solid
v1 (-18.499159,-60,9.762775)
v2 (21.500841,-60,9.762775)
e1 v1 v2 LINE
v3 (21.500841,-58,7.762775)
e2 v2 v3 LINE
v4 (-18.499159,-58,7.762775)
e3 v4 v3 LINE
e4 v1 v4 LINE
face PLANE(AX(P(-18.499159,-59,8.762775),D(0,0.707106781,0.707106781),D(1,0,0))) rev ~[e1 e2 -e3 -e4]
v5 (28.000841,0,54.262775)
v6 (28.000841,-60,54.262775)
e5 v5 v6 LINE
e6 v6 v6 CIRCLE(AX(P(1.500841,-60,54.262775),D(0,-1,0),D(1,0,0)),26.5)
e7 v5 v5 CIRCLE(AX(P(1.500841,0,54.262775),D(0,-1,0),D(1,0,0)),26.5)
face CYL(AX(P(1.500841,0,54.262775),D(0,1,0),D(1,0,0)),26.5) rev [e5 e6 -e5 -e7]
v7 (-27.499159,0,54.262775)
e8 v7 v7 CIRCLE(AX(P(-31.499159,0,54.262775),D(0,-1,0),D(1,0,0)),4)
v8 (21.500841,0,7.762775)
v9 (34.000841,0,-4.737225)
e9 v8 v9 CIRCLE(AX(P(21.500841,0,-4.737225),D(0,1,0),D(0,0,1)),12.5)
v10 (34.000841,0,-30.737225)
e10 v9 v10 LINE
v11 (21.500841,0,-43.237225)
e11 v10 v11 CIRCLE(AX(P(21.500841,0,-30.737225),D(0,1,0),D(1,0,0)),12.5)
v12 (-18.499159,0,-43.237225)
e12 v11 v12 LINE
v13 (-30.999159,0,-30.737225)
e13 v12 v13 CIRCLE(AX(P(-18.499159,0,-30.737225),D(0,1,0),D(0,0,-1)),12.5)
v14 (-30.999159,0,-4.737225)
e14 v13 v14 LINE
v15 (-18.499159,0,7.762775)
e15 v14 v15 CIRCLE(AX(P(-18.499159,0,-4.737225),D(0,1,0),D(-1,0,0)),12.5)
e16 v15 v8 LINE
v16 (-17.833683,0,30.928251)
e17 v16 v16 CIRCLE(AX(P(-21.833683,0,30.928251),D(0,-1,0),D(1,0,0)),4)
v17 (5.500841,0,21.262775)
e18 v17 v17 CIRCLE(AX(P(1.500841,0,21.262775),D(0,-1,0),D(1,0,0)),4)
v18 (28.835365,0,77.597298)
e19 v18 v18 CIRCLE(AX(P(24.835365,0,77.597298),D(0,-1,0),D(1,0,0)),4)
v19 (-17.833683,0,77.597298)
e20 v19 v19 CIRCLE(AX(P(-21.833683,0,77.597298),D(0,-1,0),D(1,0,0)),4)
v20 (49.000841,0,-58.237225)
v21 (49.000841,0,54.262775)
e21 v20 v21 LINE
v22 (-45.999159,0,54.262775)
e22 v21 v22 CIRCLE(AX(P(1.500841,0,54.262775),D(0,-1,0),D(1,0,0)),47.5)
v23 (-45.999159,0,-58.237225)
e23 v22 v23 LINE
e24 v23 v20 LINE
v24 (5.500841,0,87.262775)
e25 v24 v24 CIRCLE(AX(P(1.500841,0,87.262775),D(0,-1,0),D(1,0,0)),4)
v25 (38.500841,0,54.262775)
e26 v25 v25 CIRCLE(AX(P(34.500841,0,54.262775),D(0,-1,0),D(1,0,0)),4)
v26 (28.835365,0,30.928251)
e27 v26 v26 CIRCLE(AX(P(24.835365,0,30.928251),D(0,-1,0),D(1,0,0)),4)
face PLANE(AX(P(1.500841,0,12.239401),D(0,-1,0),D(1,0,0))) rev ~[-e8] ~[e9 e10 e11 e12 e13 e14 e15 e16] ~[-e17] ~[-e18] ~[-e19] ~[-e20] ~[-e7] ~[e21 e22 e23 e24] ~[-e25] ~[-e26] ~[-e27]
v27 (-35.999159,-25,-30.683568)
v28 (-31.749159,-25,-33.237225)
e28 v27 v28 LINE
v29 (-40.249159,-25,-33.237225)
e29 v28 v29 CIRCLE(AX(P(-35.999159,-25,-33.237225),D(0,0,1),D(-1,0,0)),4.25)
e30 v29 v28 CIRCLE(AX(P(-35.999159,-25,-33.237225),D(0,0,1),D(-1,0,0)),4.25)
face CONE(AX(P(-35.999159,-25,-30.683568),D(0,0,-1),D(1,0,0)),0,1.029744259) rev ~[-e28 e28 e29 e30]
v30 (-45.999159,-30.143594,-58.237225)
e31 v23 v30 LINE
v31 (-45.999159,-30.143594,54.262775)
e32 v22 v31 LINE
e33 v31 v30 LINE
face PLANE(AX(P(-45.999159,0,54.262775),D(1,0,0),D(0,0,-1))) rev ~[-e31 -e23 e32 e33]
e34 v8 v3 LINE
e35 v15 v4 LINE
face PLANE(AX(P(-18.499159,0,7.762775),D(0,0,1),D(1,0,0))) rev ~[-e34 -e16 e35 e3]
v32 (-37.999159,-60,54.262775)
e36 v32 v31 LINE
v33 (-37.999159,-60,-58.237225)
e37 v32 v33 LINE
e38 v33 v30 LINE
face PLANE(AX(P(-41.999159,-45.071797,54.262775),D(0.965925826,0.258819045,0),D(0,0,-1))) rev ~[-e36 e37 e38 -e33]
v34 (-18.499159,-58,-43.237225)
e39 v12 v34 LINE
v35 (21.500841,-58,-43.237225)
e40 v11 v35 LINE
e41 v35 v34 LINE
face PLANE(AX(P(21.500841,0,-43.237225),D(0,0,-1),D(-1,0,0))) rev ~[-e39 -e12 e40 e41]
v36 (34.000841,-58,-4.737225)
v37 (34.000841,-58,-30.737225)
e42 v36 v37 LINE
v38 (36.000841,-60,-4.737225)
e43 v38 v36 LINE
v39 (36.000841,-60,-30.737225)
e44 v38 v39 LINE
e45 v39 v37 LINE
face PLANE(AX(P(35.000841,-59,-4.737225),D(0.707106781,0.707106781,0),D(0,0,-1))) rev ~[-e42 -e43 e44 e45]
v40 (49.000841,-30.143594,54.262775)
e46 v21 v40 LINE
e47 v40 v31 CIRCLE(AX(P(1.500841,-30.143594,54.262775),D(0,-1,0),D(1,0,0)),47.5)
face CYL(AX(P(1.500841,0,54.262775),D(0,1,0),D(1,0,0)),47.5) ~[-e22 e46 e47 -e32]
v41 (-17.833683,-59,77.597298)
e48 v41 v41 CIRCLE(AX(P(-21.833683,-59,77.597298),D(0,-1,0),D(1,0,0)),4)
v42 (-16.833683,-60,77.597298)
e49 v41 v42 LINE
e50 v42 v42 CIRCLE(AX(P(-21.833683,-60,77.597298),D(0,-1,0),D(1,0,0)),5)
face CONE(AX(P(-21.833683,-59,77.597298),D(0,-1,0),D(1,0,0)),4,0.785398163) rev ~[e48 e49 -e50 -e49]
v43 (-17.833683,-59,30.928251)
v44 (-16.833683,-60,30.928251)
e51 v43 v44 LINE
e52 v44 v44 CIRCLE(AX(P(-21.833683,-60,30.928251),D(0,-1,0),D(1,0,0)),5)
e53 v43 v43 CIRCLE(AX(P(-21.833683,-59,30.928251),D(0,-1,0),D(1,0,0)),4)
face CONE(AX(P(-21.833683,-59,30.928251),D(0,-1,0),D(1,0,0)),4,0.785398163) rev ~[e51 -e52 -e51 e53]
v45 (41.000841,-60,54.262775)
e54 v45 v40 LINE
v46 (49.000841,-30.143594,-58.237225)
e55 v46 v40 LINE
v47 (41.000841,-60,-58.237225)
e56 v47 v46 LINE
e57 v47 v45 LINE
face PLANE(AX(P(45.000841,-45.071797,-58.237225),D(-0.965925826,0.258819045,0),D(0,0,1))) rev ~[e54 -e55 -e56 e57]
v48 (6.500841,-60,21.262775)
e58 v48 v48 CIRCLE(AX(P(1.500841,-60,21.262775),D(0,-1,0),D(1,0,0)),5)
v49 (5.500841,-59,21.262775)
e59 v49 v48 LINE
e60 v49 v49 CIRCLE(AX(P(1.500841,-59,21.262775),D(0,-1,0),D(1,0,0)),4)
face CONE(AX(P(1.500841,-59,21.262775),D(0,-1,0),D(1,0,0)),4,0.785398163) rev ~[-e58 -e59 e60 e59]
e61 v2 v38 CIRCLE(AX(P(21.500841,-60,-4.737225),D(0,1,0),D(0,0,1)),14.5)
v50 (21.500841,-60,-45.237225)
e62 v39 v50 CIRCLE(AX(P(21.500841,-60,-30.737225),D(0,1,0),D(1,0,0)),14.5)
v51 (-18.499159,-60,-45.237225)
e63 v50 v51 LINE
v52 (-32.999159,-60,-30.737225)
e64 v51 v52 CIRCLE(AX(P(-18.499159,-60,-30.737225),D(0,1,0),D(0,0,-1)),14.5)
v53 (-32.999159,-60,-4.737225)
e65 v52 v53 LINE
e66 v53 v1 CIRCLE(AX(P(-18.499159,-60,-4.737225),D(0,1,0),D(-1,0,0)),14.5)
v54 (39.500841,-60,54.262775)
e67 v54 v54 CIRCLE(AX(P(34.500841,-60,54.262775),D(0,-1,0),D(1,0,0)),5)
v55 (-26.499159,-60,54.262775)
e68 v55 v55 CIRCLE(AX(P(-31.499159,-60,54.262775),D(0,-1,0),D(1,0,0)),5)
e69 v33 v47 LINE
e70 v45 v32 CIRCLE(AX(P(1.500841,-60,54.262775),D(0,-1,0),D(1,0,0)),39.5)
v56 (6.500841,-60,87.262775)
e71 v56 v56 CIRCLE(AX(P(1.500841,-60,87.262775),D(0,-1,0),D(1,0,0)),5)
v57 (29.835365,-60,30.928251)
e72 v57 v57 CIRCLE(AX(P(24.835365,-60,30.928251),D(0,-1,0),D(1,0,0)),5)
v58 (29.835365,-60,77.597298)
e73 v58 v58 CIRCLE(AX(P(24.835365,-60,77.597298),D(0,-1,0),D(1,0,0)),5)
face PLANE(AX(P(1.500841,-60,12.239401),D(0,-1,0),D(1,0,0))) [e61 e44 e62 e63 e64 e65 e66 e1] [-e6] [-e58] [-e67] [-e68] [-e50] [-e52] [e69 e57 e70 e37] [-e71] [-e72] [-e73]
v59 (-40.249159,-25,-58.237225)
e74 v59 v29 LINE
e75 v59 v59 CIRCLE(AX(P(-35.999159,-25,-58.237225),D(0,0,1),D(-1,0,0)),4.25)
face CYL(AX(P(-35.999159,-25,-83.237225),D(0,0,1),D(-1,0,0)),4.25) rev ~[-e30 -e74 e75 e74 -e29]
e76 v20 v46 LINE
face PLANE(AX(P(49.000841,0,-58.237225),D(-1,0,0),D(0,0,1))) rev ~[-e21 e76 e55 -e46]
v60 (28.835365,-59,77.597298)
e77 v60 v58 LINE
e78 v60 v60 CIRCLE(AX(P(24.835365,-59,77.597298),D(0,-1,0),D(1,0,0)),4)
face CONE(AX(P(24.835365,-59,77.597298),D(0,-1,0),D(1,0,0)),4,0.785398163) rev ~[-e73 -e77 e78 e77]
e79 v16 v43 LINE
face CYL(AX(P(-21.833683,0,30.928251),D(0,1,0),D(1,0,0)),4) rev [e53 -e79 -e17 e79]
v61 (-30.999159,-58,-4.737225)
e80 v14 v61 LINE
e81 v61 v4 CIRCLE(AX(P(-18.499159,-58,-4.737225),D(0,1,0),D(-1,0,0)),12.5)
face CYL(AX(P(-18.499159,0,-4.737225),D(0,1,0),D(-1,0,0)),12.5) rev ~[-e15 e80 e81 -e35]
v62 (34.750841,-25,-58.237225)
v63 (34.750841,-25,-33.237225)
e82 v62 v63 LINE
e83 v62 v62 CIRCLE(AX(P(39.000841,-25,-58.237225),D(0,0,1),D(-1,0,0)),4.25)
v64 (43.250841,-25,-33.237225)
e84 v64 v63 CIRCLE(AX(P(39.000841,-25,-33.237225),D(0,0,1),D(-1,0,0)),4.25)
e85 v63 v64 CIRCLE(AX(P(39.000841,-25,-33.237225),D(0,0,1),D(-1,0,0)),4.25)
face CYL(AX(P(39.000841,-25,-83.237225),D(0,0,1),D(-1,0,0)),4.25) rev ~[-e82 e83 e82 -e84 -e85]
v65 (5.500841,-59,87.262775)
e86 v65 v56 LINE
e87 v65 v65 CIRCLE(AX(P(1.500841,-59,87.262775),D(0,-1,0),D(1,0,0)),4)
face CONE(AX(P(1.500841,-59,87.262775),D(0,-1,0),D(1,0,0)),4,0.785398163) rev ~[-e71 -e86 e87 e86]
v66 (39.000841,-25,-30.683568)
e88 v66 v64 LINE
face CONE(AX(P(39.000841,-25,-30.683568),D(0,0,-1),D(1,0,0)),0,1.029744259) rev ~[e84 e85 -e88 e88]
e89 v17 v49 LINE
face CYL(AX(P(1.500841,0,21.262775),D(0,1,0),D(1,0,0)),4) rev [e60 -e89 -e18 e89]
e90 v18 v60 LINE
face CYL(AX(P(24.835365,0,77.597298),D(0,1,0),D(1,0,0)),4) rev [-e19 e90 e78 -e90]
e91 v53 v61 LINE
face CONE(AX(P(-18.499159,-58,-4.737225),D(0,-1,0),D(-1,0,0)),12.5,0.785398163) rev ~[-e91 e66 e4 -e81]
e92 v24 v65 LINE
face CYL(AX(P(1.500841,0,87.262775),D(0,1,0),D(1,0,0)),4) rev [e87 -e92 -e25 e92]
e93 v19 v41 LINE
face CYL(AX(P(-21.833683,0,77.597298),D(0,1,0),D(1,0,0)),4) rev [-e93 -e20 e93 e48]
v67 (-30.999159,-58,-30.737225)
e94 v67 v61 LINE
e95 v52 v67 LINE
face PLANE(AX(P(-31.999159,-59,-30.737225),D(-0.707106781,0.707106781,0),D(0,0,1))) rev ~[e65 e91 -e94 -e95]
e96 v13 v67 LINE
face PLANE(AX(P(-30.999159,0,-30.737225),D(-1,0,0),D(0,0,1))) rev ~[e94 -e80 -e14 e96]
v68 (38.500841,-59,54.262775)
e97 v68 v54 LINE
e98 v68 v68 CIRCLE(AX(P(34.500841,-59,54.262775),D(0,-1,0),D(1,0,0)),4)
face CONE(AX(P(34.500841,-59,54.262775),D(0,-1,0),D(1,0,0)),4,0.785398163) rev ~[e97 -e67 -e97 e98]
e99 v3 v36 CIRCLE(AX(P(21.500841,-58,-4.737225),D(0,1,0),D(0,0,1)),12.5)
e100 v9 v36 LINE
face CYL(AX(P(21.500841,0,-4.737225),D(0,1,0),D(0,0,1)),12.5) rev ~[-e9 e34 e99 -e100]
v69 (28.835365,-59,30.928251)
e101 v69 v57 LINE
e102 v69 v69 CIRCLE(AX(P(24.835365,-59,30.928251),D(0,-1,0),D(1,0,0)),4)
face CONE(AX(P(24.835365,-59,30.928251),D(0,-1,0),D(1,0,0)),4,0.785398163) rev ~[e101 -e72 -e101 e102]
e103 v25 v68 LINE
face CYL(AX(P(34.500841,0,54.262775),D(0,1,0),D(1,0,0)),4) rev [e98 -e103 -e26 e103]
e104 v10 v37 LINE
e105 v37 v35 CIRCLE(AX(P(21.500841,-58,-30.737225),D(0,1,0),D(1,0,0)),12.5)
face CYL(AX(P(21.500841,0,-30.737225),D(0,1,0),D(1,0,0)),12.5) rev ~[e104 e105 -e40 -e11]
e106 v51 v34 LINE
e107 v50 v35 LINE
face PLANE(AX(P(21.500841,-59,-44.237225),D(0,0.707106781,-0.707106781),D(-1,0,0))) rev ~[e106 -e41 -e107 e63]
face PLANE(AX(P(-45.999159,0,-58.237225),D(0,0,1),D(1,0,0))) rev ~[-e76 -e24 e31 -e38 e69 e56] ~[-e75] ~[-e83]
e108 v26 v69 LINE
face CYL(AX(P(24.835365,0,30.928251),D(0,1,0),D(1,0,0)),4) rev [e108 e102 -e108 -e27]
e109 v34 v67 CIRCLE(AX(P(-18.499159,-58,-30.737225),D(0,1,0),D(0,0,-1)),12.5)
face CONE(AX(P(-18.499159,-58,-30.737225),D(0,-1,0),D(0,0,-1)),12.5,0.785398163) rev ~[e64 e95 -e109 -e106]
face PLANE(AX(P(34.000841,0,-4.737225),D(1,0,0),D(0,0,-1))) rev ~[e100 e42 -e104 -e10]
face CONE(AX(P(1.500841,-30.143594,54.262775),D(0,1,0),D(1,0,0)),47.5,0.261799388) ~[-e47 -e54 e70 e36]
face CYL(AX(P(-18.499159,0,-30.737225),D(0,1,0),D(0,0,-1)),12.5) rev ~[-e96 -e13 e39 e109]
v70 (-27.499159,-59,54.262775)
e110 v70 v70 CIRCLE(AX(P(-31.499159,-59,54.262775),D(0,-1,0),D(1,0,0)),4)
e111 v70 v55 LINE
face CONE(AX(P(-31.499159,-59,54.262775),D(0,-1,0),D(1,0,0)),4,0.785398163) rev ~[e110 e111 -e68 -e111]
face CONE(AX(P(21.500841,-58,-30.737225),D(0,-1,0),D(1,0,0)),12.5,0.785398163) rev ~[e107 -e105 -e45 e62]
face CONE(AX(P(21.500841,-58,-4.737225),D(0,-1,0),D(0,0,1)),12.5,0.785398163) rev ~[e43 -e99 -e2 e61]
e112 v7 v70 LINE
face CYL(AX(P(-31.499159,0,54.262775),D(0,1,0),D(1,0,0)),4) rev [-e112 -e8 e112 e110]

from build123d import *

# Parameters (mm, degrees)
F0_R     = 4
F0_R_2   = 26.5
F1_DEPTH = 60
F2_SIZE  = 1
F3_SIZE  = 2
F4_SIZE2 = 29.8564064606
F4_SIZE  = 8
F6_D     = 8.5
F6_DEPTH = 25
F6_TIP   = 2.5536576309


with BuildPart() as f1:
    # F0 (on Front) → F1 (new body)
    with BuildSketch(Plane.XZ):
        with BuildLine():
            Line((-45.9991587698, 54.2627746064), (-45.9991587698, -58.2372253936))
            Line((-45.9991587698, -58.2372253936), (49.0008412302, -58.2372253936))
            Line((49.0008412302, -58.2372253936), (49.0008412302, 54.2627746064))
            ThreePointArc((49.0008412302, 54.2627746064), (1.5008412302, 101.7627746064), (-45.9991587698, 54.2627746064))
        make_face()
        with BuildLine():
            ThreePointArc((-30.9991587698, -4.7372253936), (-27.3379935347, 4.1016093712), (-18.4991587698, 7.7627746064))
            Line((-18.4991587698, 7.7627746064), (21.5008412302, 7.7627746064))
            ThreePointArc((21.5008412302, 7.7627746064), (30.339675995, 4.1016093712), (34.0008412302, -4.7372253936))
            Line((34.0008412302, -4.7372253936), (34.0008412302, -30.7372253936))
            ThreePointArc((34.0008412302, -30.7372253936), (30.339675995, -39.5760601585), (21.5008412302, -43.2372253936))
            Line((21.5008412302, -43.2372253936), (-18.4991587698, -43.2372253936))
            ThreePointArc((-18.4991587698, -43.2372253936), (-27.3379935347, -39.5760601585), (-30.9991587698, -30.7372253936))
            Line((-30.9991587698, -30.7372253936), (-30.9991587698, -4.7372253936))
        make_face(mode=Mode.SUBTRACT)
        with Locations((1.5008412302, 21.2627746064)):
            Circle(F0_R, mode=Mode.SUBTRACT)
        with Locations((-31.4991587698, 54.2627746064)):
            Circle(F0_R, mode=Mode.SUBTRACT)
        with Locations((-21.833682549, 30.9282508272)):
            Circle(F0_R, mode=Mode.SUBTRACT)
        with Locations((1.5008412302, 54.2627746064)):
            Circle(F0_R_2, mode=Mode.SUBTRACT)
        with Locations((-21.833682549, 77.5972983855)):
            Circle(F0_R, mode=Mode.SUBTRACT)
        with Locations((1.5008412302, 87.2627746064)):
            Circle(F0_R, mode=Mode.SUBTRACT)
        with Locations((24.8353650093, 30.9282508272)):
            Circle(F0_R, mode=Mode.SUBTRACT)
        with Locations((34.5008412302, 54.2627746064)):
            Circle(F0_R, mode=Mode.SUBTRACT)
        with Locations((24.8353650093, 77.5972983855)):
            Circle(F0_R, mode=Mode.SUBTRACT)
    extrude(amount=F1_DEPTH)

    # F2
    f2_edges = [f1.edges().sort_by_distance(p)[0] for p in [
        (-35.499159, -60, 54.262775),
        (-25.833683, -60, 77.597298),
        (-2.499159, -60, 87.262775),
        (20.835365, -60, 77.597298),
        (30.500841, -60, 54.262775),
        (20.835365, -60, 30.928251),
        (-2.499159, -60, 21.262775),
        (-25.833683, -60, 30.928251),
    ]]
    chamfer(f2_edges, length=F2_SIZE)

    # F3
    f3_edges = [f1.edges().sort_by_distance(p)[0] for p in [
        (1.500841, -60, 7.762775),
    ]]
    chamfer(f3_edges, length=F3_SIZE)

    # F4
    f4_edges = [f1.edges().sort_by_distance(p)[0] for p in [
        (1.500841, -60, 101.762775),
    ]]
    f4_side = f1.faces().sort_by_distance((1.500841, -60, 11.623554))[0]
    chamfer(f4_edges, length=F4_SIZE, length2=F4_SIZE2, reference=f4_side)

    # F6
    with Locations(Plane(origin=(0, 0, -58.2372253936), x_dir=(1, 0, 0), z_dir=(0, 0, -1))):
        with Locations((-35.9991587698, 25), (39.0008412302, 25)):
            Hole(F6_D / 2, depth=F6_DEPTH)
            with Locations((0, 0, -(F6_DEPTH + F6_TIP / 2))):  # 118° drill point
                Cone(0, F6_D / 2, F6_TIP, mode=Mode.SUBTRACT)


solid = f1.part
